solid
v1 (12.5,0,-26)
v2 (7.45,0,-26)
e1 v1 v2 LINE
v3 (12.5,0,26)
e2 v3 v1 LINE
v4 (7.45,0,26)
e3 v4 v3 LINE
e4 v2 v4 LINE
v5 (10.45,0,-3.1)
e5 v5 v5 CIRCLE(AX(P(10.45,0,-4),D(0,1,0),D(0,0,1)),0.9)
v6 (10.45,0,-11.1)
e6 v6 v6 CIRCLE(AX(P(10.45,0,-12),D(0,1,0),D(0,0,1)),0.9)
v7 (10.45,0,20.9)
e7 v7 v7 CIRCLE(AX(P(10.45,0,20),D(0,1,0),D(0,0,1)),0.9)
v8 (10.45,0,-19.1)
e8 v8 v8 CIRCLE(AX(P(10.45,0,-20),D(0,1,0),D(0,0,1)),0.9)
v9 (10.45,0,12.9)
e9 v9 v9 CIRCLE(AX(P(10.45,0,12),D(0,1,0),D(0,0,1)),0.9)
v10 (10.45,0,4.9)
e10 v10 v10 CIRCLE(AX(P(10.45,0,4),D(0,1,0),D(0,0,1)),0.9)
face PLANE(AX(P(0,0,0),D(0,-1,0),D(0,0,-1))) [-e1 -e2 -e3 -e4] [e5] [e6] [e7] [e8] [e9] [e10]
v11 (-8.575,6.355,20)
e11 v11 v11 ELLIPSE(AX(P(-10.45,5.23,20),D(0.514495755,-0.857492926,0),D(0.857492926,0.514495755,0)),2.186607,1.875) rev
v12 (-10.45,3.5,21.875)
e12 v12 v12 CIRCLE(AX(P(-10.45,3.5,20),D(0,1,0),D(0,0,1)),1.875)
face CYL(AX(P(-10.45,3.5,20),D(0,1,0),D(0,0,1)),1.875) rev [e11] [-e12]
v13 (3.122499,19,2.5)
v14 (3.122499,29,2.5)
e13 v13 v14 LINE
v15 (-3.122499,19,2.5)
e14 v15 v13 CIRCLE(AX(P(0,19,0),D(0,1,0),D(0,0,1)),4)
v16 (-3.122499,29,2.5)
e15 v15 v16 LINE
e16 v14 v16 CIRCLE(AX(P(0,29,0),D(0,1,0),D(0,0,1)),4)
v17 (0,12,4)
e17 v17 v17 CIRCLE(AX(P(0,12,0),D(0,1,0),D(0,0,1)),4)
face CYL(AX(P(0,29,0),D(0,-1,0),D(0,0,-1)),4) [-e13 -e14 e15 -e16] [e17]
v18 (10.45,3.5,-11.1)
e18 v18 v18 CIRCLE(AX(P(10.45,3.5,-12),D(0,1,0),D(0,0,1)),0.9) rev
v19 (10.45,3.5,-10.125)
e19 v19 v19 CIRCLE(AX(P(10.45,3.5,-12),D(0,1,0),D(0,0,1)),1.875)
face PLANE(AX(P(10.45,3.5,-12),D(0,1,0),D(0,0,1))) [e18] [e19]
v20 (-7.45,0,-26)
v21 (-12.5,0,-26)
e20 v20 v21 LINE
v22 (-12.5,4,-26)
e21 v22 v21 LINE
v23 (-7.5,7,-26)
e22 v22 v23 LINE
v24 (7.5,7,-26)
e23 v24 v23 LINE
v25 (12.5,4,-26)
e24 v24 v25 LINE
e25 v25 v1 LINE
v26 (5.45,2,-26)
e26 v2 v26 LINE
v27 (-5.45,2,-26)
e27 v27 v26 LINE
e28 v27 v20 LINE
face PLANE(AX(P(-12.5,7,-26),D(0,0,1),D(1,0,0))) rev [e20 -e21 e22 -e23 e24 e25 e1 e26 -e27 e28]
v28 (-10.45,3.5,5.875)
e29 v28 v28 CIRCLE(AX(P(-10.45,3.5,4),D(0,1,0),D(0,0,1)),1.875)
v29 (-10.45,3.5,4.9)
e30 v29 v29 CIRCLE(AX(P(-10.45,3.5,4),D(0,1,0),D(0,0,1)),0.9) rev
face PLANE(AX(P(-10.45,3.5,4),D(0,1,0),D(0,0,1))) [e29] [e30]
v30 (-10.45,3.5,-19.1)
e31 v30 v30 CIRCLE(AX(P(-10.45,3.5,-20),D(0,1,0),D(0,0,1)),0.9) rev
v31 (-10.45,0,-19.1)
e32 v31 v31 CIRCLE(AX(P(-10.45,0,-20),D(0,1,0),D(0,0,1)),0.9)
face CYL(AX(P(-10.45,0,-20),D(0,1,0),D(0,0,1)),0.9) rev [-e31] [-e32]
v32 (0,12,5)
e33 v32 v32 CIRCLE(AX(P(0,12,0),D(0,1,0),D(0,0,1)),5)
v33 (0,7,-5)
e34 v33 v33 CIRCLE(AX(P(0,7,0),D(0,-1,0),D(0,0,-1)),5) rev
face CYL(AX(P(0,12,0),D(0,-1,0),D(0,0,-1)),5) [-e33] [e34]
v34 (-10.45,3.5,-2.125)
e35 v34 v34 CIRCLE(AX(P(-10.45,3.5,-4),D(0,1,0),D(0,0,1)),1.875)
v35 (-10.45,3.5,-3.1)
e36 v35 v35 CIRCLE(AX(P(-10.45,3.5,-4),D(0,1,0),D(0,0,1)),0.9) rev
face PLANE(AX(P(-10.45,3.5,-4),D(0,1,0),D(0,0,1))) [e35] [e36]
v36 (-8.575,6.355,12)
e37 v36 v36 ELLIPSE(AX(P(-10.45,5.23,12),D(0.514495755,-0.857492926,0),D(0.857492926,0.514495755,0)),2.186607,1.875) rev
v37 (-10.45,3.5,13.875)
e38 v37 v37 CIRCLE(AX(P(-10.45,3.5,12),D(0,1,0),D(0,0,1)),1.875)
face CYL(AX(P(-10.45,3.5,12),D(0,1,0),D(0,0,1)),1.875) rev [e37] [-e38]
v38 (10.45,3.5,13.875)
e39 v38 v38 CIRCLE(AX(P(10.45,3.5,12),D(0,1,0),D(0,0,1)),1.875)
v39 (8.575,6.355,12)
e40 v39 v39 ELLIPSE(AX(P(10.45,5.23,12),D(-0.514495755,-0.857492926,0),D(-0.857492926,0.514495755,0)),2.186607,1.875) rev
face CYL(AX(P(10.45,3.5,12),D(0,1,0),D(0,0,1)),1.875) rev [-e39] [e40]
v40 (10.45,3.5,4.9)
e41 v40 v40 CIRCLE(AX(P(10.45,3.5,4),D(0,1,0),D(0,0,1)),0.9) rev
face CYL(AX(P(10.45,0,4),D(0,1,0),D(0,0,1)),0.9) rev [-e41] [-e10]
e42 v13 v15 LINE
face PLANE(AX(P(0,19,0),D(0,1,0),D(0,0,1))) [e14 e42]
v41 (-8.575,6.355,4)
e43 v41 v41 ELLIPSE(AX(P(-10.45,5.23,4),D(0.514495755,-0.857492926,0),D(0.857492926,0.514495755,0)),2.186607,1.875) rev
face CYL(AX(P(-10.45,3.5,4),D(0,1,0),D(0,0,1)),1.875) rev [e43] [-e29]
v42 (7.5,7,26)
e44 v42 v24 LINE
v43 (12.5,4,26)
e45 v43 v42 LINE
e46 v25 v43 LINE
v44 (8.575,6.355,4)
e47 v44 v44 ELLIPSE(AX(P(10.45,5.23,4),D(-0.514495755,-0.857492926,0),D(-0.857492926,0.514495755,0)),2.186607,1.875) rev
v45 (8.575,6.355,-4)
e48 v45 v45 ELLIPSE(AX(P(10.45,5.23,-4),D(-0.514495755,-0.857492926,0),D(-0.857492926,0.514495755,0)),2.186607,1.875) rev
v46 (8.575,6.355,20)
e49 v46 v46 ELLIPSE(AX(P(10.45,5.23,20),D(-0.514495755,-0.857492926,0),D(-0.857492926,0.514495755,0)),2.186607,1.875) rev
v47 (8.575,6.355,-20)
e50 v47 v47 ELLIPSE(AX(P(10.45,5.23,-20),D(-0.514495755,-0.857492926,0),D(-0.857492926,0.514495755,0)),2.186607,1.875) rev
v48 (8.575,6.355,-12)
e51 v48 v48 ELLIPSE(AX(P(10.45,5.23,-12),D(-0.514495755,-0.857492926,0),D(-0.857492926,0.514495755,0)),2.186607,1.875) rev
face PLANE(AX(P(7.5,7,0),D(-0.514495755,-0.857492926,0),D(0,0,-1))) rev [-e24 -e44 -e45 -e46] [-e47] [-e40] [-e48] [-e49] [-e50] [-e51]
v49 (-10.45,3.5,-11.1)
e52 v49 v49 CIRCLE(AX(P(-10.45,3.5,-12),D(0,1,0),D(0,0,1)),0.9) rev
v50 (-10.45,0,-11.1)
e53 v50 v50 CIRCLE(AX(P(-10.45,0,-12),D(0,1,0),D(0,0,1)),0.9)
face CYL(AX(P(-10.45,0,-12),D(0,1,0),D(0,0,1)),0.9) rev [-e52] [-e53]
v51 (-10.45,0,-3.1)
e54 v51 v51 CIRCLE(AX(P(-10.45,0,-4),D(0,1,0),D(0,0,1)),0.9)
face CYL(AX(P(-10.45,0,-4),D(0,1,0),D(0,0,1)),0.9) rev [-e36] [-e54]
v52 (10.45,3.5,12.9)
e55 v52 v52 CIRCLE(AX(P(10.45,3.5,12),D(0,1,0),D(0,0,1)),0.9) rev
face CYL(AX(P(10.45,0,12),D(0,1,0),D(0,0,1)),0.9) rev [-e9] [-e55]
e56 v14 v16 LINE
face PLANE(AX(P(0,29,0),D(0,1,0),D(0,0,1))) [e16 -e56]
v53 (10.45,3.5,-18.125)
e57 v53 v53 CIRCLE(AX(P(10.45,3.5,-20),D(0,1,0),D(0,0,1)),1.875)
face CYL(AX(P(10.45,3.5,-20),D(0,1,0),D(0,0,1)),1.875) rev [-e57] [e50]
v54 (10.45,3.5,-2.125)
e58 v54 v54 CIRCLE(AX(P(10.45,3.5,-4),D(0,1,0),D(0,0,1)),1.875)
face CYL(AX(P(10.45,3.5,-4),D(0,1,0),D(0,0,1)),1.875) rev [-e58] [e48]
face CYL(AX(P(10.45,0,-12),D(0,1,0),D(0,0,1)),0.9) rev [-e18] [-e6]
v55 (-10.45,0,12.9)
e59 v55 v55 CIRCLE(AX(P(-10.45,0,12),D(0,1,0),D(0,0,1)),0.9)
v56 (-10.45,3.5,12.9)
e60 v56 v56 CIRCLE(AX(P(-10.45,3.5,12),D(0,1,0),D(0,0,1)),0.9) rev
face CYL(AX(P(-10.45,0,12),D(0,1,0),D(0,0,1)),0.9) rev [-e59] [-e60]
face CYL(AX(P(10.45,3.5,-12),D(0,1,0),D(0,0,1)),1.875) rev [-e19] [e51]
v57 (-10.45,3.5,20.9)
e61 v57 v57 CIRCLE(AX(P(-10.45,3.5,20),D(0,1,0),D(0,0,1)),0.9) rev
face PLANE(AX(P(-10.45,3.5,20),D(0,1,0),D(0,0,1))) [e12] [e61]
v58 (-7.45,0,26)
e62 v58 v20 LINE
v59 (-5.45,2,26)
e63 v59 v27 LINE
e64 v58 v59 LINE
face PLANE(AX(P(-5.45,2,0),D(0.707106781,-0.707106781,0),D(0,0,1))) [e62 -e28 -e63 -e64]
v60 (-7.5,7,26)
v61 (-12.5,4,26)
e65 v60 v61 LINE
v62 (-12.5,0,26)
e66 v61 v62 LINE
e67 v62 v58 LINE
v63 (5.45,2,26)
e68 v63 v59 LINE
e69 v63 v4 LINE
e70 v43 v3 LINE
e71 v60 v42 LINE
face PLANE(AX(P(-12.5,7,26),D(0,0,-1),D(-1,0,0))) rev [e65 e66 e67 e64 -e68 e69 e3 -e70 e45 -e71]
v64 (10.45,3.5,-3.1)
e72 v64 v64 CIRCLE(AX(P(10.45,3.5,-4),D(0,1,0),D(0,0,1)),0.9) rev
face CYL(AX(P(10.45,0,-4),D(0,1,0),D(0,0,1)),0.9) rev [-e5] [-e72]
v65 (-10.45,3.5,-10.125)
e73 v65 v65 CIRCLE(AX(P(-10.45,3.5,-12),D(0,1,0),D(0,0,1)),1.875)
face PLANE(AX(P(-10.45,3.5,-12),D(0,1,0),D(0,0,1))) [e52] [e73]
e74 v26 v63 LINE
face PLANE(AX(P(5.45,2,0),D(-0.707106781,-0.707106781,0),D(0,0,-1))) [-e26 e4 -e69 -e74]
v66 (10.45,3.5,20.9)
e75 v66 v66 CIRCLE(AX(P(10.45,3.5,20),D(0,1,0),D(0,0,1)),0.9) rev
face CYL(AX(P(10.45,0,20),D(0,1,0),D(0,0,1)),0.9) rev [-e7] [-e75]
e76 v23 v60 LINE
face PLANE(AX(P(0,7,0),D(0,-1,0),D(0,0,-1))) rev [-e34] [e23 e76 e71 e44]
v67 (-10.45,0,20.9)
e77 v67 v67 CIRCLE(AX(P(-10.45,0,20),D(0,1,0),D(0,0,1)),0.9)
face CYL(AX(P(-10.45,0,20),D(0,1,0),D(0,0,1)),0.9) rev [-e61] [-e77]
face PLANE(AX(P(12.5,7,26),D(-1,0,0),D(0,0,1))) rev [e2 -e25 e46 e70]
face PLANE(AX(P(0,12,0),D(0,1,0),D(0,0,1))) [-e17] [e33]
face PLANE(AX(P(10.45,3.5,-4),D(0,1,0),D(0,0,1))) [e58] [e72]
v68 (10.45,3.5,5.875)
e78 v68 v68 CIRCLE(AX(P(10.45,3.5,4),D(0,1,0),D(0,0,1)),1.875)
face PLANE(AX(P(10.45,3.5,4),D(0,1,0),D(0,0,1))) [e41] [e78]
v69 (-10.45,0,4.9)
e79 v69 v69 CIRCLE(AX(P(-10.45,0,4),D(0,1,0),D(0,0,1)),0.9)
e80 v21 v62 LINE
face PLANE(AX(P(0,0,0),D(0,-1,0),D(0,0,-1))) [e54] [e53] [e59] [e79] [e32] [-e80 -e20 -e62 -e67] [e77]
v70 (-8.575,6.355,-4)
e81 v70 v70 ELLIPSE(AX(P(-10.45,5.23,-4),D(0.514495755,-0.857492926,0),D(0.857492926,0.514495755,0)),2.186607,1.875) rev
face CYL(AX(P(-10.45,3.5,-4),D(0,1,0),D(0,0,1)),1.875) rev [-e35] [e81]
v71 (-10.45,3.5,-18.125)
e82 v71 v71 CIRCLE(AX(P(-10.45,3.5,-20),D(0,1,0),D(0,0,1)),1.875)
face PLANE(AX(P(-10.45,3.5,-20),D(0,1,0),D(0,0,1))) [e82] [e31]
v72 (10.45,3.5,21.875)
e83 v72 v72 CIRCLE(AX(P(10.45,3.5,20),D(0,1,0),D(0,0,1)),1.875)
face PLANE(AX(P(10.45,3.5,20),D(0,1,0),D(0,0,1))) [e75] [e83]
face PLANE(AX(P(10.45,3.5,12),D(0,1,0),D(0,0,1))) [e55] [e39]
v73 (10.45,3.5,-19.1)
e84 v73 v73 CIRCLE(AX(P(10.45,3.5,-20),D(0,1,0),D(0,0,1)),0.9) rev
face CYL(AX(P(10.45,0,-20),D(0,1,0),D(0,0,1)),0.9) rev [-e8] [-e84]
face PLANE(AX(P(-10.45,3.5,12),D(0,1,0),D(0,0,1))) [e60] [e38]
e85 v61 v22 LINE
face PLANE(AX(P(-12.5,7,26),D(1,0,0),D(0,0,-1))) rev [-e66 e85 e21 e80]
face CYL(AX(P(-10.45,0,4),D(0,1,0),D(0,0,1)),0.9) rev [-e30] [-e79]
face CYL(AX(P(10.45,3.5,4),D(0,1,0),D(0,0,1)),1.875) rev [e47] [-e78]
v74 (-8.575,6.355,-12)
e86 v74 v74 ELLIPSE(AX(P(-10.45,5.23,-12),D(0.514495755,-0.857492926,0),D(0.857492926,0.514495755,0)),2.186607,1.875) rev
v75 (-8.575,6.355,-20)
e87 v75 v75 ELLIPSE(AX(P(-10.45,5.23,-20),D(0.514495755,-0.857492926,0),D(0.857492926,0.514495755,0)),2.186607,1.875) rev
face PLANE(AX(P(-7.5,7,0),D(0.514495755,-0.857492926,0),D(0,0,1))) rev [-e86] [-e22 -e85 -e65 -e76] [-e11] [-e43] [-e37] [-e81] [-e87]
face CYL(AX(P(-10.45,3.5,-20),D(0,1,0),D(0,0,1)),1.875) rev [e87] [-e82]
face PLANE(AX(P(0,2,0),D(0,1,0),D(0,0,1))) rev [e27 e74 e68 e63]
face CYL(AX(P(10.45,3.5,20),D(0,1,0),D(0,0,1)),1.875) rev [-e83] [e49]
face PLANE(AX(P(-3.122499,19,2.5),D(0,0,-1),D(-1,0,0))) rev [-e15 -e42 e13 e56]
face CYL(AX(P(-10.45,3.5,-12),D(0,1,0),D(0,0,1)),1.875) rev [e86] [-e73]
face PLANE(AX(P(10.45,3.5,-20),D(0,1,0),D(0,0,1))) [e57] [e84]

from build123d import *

# Parameters (mm, degrees)
SKETCH1_W           = 25
SKETCH1_H           = 52
BOSS_EXTRUDE1_DEPTH = 7
SKETCH2_R           = 0.9
CUT_EXTRUDE1_DEPTH  = 30.685855218
LPATTERN1_COUNT     = 6
LPATTERN1_PITCH     = 8
SKETCH5_R           = 4
BOSS_EXTRUDE2_DEPTH = 22
SKETCH6_R           = 5
SKETCH6_R_2         = 4
BOSS_EXTRUDE3_DEPTH = 5
CUT_EXTRUDE2_START  = -10
CUT_EXTRUDE2_DEPTH  = 10
SKETCH9_R           = 1.875
CUT_EXTRUDE3_DEPTH  = 3.5
LPATTERN2_COUNT     = 6
LPATTERN2_PITCH     = 8
CHAMFER2_SIZE       = 3
CHAMFER2_SIZE_2     = 5
SKETCH10_W          = 14.9
SKETCH10_H          = 52
CUT_EXTRUDE4_DEPTH  = 2
CHAMFER3_SIZE       = 2


# Some blends are built 0.0001 mm under size
with BuildPart() as part:
    # Sketch1 → Boss-Extrude1 (new body)
    with BuildSketch(Plane(origin=(0, 0, 0), x_dir=(1, 0, 0), z_dir=(0, 1, 0))):
        Rectangle(SKETCH1_W, SKETCH1_H)
    extrude(amount=BOSS_EXTRUDE1_DEPTH)

    # Sketch2 → Cut-Extrude1 (cut, through all)
    with BuildSketch(Plane(origin=(0, 7, 0), x_dir=(1, 0, 0), z_dir=(0, 1, 0))):
        with Locations(Location((-10.45, -20, 0), (0, 0, 270))):
            Circle(SKETCH2_R)
        with Locations(Location((10.45, -20, 0), (0, 0, 270))):
            Circle(SKETCH2_R)
    cut_extrude1 = extrude(amount=-CUT_EXTRUDE1_DEPTH, mode=Mode.SUBTRACT)

    # LPattern1: Cut-Extrude1 ×6
    with Locations(*[(0, 0, -i * LPATTERN1_PITCH) for i in range(1, LPATTERN1_COUNT)]):
        add(cut_extrude1, mode=Mode.SUBTRACT)

    # Sketch5 → Boss-Extrude2 (add)
    with BuildSketch(Plane(origin=(0, 7, 0), x_dir=(1, 0, 0), z_dir=(0, 1, 0))):
        with Locations(Location((0, 0, 0), (0, 0, 90))):
            Circle(SKETCH5_R)
    extrude(amount=BOSS_EXTRUDE2_DEPTH)

    # Sketch6 → Boss-Extrude3 (add)
    with BuildSketch(Plane(origin=(0, 7, 0), x_dir=(1, 0, 0), z_dir=(0, 1, 0))):
        with Locations(Location((0, 0, 0), (0, 0, 90))):
            Circle(SKETCH6_R)
        with Locations(Location((0, 0, 0), (0, 0, 270))):
            Circle(SKETCH6_R_2, mode=Mode.SUBTRACT)
    extrude(amount=BOSS_EXTRUDE3_DEPTH)

    # Sketch8 → Cut-Extrude2 (cut)
    with BuildSketch(Plane(origin=(0, 29, 0), x_dir=(1, 0, 0), z_dir=(0, 1, 0)).offset(CUT_EXTRUDE2_START)):
        with BuildLine():
            Line((-3.122498999, -2.5), (3.122498999, -2.5))
            ThreePointArc((3.122498999, -2.5), (0, -4), (-3.122498999, -2.5))
        make_face()
    extrude(amount=CUT_EXTRUDE2_DEPTH, mode=Mode.SUBTRACT)

    # Sketch9 → Cut-Extrude3 (cut)
    with BuildSketch(Plane(origin=(0, 7, 0), x_dir=(1, 0, 0), z_dir=(0, 1, 0))):
        with Locations(Location((-10.45, 20, 0), (0, 0, 270))):
            Circle(SKETCH9_R)
        with Locations(Location((10.45, 20, 0), (0, 0, 270))):
            Circle(SKETCH9_R)
    cut_extrude3 = extrude(amount=-CUT_EXTRUDE3_DEPTH, mode=Mode.SUBTRACT)

    # LPattern2: Cut-Extrude3 ×6
    with Locations(*[(0, 0, i * LPATTERN2_PITCH) for i in range(1, LPATTERN2_COUNT)]):
        add(cut_extrude3, mode=Mode.SUBTRACT)

    # Chamfer2
    # the kernel refuses this chamfer: 5, 3 mm, written as the material it takes off along each edge
    with BuildSketch(Plane(origin=(-12.5, 7, -38.931305486), x_dir=(-0.0551862070597658, -0.9984760801092616, 0), z_dir=(0, 0, 1)), Plane(origin=(12.5, 7, 38.931305486), x_dir=(0.0551862070597658, -0.9984760801092616, 0), z_dir=(0, 0, -1))) as chamfer2_piece_1:
        Polygon((CHAMFER2_SIZE * 0.998476080109, CHAMFER2_SIZE * 0.0551862070598), (-CHAMFER2_SIZE_2 * 0.0551862070598, CHAMFER2_SIZE_2 * 0.998476080109), (0, 0), align=None)
    extrude(amount=77.862610972, mode=Mode.SUBTRACT)

    # Sketch10 → Cut-Extrude4 (cut)
    with BuildSketch(Plane.XZ):
        Rectangle(SKETCH10_W, SKETCH10_H)
    extrude(amount=-CUT_EXTRUDE4_DEPTH, mode=Mode.SUBTRACT)

    # Chamfer3
    chamfer3_edges = [part.edges().sort_by_distance(p)[0] for p in [
        (7.45, 2, 0),
        (-7.45, 2, 0),
    ]]
    chamfer(chamfer3_edges, length=CHAMFER3_SIZE - 0.0001)  # a hair under: the kernel refuses the full size


solid = part.part
